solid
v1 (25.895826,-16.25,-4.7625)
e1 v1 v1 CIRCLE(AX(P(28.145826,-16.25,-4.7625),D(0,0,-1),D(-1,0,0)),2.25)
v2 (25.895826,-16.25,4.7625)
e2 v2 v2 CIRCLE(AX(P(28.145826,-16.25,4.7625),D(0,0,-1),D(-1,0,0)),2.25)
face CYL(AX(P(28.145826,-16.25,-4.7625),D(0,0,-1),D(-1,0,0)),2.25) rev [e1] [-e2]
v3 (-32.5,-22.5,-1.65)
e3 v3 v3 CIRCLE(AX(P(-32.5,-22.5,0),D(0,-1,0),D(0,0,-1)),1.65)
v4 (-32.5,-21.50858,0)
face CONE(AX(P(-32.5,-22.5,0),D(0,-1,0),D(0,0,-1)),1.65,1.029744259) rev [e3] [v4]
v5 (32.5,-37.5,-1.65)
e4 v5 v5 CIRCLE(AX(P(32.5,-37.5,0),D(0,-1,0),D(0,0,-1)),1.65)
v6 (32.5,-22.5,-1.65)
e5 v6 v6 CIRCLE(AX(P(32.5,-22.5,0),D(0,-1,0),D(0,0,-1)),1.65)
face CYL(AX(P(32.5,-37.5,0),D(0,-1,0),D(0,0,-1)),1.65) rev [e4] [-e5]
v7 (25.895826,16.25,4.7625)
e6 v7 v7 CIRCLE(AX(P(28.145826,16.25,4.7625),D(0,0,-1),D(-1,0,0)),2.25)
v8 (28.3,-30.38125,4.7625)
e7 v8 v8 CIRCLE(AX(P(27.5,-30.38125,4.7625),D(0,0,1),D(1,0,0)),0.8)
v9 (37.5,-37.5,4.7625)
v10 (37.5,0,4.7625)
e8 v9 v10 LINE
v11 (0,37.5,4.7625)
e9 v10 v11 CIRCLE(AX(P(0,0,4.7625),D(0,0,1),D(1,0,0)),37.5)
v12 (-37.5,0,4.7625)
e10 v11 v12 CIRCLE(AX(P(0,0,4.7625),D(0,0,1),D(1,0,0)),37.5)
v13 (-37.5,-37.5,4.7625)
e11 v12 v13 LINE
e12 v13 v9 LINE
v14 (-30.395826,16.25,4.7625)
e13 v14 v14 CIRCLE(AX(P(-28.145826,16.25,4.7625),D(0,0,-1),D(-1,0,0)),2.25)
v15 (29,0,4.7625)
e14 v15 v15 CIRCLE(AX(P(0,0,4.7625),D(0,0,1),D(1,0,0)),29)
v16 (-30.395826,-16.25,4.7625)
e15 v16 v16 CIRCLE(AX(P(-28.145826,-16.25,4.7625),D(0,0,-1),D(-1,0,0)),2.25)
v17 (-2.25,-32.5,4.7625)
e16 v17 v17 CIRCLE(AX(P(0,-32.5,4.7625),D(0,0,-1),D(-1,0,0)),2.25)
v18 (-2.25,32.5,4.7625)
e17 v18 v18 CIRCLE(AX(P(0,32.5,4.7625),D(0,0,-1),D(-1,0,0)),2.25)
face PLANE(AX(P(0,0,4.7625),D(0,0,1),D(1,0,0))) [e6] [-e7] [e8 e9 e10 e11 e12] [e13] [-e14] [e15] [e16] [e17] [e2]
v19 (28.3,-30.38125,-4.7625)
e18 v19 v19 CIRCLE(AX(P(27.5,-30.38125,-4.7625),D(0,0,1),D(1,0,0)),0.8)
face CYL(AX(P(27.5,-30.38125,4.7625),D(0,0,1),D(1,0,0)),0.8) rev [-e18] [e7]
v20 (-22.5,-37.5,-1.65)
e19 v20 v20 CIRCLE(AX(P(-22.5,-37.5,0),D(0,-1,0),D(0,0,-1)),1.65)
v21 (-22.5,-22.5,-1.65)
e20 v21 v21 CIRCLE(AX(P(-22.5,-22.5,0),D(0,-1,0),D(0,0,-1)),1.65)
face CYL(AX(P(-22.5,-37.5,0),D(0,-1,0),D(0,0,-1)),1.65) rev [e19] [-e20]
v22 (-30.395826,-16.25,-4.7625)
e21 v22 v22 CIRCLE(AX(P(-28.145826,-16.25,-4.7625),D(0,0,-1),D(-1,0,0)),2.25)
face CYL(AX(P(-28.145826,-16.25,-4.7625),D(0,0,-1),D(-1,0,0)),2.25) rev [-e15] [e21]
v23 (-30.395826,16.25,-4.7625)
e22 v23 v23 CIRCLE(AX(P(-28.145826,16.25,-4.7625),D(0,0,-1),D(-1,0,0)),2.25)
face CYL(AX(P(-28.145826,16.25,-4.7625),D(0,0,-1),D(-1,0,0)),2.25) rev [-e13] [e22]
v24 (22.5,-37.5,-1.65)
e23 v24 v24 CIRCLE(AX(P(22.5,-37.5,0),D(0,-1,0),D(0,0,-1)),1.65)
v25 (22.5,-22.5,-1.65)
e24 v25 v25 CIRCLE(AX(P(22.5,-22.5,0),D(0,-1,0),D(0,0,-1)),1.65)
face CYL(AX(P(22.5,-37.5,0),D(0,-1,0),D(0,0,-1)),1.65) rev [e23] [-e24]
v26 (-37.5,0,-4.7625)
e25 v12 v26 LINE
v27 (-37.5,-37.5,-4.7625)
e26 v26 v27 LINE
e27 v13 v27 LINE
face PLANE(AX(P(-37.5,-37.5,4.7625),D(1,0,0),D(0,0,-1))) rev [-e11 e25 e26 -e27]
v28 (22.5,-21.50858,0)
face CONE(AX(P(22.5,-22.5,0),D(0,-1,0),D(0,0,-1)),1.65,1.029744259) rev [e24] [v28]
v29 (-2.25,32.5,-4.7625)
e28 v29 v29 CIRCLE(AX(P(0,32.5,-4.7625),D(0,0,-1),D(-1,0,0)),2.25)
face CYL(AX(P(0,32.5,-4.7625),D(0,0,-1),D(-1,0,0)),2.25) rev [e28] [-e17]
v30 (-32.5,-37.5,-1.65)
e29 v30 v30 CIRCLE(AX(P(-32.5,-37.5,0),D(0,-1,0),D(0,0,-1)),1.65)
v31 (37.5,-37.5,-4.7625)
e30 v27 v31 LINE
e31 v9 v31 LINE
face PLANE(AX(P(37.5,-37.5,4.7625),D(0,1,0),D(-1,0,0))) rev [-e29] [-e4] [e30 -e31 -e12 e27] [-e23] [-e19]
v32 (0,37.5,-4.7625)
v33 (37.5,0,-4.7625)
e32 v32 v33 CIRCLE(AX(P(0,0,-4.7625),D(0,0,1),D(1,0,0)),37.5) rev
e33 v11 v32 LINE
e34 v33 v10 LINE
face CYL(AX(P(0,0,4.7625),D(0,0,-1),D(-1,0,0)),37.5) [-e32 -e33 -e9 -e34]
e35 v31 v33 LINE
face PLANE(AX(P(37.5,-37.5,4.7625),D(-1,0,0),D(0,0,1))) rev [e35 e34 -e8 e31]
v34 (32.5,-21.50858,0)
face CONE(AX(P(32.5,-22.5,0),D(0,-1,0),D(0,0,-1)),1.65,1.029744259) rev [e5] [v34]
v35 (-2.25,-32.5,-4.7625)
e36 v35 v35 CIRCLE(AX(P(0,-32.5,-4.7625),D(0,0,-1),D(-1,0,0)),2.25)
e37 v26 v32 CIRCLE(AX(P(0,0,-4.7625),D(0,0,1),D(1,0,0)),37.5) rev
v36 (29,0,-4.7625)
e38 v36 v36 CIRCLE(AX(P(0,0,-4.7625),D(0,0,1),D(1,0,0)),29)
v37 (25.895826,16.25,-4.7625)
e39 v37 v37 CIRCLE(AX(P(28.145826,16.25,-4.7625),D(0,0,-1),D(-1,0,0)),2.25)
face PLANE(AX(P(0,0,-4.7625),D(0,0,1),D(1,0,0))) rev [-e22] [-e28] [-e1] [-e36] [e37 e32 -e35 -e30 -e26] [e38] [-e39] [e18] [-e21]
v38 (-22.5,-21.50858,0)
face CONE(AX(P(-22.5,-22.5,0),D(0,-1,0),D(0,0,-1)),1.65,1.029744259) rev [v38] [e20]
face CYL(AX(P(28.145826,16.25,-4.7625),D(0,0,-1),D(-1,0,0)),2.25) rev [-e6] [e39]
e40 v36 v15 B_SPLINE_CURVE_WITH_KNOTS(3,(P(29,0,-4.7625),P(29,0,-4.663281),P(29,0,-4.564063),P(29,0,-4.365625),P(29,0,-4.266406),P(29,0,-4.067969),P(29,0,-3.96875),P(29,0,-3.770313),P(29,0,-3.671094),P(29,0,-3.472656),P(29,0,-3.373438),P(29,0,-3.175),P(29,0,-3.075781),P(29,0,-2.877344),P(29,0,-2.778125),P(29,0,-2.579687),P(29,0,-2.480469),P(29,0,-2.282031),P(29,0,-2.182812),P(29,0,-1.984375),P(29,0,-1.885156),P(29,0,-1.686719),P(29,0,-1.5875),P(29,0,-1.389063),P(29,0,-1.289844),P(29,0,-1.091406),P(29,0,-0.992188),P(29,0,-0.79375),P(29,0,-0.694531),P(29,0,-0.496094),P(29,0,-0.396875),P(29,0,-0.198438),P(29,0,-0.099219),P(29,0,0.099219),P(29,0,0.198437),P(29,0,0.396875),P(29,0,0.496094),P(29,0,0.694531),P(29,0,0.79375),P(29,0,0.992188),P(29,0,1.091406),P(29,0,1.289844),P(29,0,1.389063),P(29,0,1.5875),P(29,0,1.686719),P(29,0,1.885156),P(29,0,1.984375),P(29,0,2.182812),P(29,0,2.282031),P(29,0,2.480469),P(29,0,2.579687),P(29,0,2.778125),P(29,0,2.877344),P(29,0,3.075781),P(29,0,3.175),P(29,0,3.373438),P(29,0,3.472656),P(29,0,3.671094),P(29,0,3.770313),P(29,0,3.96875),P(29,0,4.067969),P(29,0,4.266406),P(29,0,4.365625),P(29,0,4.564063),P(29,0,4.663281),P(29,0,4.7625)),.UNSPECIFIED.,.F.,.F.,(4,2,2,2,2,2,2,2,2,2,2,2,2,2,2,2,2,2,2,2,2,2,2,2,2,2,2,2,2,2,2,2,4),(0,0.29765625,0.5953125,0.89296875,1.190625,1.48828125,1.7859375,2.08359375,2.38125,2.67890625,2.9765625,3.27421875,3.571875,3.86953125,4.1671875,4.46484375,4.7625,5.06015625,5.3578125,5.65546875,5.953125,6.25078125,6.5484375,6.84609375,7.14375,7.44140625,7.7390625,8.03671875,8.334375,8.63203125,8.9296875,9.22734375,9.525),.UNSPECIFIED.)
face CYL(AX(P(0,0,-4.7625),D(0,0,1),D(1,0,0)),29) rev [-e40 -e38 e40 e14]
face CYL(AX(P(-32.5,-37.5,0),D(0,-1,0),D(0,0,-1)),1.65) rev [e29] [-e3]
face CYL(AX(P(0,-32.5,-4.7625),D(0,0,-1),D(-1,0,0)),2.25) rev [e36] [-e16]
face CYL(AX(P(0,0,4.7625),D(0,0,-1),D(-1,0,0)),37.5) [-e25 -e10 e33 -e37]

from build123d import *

# Parameters (mm, degrees)
SKETCH2_W                 = 75
SKETCH2_H                 = 75
BOSS_EXTRUDE1_DEPTH       = 4.7625
M4X0_7_TAPPED_HOLE1_D     = 3.3
M4X0_7_TAPPED_HOLE1_DEPTH = 15
M4X0_7_TAPPED_HOLE1_TIP   = 0.991420021
SKETCH6_R                 = 29
CUT_EXTRUDE1_DEPTH        = 54.881588924
M4_CLEARANCE_HOLE1_D      = 4.5
FILLET1_R                 = 37.5
M2X0_4_TAPPED_HOLE1_D     = 1.6


with BuildPart() as part:
    # Sketch2 → Boss-Extrude1 (new, symmetric)
    with BuildSketch(Plane.XY):
        Rectangle(SKETCH2_W, SKETCH2_H)
    extrude(amount=BOSS_EXTRUDE1_DEPTH, both=True)

    # M4x0.7 Tapped Hole1
    with Locations(Plane(origin=(0, -37.5, 0), x_dir=(-1, 0, 0), z_dir=(0, -1, 0))):
        with Locations((-32.5, 0), (-22.5, 0), (22.5, 0), (32.5, 0)):
            Hole(M4X0_7_TAPPED_HOLE1_D / 2, depth=M4X0_7_TAPPED_HOLE1_DEPTH)
            with Locations((0, 0, -(M4X0_7_TAPPED_HOLE1_DEPTH + M4X0_7_TAPPED_HOLE1_TIP / 2))):  # 118° drill point
                Cone(0, M4X0_7_TAPPED_HOLE1_D / 2, M4X0_7_TAPPED_HOLE1_TIP, mode=Mode.SUBTRACT)

    # Sketch6 → Cut-Extrude1 (cut, through all)
    with BuildSketch(Plane.XY.offset(4.7625)):
        Circle(SKETCH6_R)
    extrude(amount=-CUT_EXTRUDE1_DEPTH, mode=Mode.SUBTRACT)

    # M4 Clearance Hole1 (through all)
    with Locations(Plane(origin=(0, 0, -4.7625), x_dir=(-1, 0, 0), z_dir=(0, 0, -1))):
        with Locations((0, 32.5), (28.145825623, 16.25), (-28.145825623, 16.25), (-28.145825623, -16.25), (0, -32.5), (28.145825623, -16.25)):
            Hole(M4_CLEARANCE_HOLE1_D / 2)

    # Fillet1
    fillet1_edges = [part.edges().sort_by_distance(p)[0] for p in [
        (-37.5, 37.5, 0),
        (37.5, 37.5, 0),
    ]]
    fillet(fillet1_edges, radius=FILLET1_R - 0.0001)  # a hair under: the kernel refuses the full size

    # M2x0.4 Tapped Hole1 (through all)
    with Locations(Plane.XY.offset(4.7625)):
        with Locations((27.5, -30.38125)):
            Hole(M2X0_4_TAPPED_HOLE1_D / 2)


solid = part.part
